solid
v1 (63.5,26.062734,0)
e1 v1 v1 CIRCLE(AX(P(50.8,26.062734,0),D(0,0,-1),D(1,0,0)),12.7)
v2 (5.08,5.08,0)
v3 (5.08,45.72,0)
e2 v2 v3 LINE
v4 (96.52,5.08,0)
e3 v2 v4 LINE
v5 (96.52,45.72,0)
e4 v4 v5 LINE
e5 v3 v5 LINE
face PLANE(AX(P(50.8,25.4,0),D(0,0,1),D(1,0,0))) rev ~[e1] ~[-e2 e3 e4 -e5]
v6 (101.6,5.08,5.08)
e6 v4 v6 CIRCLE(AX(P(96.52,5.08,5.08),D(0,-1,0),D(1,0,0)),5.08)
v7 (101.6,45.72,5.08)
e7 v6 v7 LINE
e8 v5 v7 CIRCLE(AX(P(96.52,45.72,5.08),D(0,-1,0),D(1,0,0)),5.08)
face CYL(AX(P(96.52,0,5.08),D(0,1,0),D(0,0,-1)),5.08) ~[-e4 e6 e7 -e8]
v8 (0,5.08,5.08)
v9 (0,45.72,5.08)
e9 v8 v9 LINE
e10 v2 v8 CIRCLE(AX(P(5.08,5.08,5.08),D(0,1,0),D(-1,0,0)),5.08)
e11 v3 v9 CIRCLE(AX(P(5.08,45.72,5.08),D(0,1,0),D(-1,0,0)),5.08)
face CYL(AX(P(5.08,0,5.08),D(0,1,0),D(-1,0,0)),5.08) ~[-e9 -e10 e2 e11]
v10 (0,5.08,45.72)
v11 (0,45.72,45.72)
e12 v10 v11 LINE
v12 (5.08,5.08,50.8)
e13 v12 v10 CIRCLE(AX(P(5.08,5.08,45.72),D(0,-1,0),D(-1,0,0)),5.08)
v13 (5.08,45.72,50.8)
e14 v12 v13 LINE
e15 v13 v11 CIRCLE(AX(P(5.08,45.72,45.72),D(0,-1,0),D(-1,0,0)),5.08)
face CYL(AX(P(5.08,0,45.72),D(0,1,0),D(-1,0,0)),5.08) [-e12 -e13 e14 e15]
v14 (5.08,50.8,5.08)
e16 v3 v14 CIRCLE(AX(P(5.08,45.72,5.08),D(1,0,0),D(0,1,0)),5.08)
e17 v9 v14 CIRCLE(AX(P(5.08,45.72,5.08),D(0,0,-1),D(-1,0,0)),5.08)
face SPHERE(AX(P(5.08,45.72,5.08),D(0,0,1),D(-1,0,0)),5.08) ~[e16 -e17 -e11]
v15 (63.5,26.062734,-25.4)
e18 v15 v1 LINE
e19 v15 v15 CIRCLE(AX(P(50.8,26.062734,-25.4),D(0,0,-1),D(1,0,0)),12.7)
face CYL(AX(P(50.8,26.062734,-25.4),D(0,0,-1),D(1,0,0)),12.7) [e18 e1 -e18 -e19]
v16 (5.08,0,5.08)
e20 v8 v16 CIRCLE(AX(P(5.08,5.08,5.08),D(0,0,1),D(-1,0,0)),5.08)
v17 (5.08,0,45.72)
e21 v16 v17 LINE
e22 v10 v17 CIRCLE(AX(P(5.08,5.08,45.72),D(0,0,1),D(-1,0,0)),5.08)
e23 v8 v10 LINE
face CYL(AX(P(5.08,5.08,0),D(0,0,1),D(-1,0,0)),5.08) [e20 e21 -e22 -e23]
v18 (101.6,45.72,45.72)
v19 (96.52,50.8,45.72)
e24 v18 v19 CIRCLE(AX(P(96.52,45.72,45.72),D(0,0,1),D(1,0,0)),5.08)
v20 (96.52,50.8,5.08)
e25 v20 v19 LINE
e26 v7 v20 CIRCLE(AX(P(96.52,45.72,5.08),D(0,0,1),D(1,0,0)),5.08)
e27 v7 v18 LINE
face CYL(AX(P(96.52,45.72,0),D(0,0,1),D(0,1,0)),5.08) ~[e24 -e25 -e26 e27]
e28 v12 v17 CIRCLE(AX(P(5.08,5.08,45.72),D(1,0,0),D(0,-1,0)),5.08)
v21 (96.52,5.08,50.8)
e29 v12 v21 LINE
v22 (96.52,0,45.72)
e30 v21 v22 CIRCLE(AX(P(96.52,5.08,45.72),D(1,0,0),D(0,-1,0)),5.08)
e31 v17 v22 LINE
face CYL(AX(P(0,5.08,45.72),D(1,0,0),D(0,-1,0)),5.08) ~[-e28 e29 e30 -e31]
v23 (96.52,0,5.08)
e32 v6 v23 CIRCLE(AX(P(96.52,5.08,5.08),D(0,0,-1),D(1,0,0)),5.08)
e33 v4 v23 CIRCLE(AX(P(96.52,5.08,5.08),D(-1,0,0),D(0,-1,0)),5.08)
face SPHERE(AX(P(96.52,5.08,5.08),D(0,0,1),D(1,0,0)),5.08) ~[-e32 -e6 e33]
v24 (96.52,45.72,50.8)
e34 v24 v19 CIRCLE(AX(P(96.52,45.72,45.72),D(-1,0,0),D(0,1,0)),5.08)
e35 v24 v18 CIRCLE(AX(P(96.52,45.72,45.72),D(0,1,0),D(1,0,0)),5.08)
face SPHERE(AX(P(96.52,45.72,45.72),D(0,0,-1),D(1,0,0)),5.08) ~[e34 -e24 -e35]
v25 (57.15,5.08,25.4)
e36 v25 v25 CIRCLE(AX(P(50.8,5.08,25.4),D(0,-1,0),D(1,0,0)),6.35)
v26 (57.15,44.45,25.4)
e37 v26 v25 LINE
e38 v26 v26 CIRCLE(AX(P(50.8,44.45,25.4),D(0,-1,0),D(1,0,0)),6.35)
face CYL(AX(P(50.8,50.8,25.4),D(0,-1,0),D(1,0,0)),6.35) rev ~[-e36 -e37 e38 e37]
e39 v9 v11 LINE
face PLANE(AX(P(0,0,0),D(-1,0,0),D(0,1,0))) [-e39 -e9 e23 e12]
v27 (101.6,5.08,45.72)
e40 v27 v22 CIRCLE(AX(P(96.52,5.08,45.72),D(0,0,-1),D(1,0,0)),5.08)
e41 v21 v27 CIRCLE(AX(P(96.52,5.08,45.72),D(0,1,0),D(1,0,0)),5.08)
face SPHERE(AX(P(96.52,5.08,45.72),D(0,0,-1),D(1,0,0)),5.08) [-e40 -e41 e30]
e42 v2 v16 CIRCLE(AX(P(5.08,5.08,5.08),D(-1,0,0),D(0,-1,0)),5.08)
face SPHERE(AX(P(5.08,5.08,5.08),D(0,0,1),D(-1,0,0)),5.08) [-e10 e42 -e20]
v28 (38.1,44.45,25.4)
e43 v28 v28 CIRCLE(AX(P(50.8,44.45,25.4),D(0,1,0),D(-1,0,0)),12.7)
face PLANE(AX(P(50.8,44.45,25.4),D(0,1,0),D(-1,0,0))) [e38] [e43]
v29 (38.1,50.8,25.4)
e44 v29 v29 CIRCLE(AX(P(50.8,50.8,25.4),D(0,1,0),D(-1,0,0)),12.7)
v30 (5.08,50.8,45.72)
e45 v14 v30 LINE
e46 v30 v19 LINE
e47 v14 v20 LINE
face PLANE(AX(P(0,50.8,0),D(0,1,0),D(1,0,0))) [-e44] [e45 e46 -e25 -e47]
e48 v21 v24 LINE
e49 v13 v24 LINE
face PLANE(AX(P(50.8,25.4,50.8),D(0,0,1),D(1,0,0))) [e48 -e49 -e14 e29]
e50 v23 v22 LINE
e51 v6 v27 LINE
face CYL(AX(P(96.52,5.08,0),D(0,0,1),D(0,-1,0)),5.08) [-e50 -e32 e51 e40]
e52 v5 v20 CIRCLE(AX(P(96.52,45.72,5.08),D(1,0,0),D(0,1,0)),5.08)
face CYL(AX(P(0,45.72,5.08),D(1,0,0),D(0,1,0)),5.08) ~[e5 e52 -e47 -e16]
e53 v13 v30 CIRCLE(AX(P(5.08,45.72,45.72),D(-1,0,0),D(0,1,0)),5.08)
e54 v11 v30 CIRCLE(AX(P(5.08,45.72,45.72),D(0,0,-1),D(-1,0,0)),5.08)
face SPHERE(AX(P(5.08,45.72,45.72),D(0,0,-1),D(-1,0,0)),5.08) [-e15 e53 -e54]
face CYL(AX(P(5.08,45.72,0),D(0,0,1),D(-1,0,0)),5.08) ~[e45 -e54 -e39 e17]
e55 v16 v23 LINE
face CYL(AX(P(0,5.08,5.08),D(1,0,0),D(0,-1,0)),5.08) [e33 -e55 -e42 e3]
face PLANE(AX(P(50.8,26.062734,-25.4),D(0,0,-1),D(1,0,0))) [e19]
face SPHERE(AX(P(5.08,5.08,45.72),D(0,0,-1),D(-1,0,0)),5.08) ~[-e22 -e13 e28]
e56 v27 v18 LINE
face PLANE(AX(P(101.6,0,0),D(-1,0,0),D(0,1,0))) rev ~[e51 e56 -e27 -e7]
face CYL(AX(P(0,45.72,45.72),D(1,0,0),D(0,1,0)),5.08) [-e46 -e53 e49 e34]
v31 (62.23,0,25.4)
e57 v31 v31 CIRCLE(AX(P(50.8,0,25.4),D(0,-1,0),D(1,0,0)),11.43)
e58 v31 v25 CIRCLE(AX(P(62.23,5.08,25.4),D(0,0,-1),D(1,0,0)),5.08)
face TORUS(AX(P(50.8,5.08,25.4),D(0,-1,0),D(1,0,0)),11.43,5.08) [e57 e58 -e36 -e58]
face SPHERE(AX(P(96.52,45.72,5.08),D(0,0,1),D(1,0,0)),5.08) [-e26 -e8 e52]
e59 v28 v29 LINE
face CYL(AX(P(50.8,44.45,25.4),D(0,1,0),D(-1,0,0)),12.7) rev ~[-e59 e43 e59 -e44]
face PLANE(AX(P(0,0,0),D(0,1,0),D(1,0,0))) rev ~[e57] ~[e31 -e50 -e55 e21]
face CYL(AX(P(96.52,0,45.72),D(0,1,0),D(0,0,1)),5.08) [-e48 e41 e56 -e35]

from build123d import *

# Parameters (mm, degrees)
F0_W           = 101.6
F0_H           = 50.8
F1_DEPTH       = 50.8
F3_D           = 12.7
F3_CBORE_D     = 25.4
F3_CBORE_DEPTH = 6.35
F5_R           = 12.7
F6_DEPTH       = 25.4
F7_R           = 5.08


with BuildPart() as f1:
    # F0 (on Top) → F1 (new body)
    with BuildSketch(Plane.XY):
        with Locations((50.8, 25.4)):
            Rectangle(F0_W, F0_H)
    extrude(amount=F1_DEPTH)

    # F3 (through all)
    with Locations(Plane(origin=(0, 50.8, 0), x_dir=(-1, 0, 0), z_dir=(0, 1, 0))):
        with Locations((-50.8, 25.4)):
            CounterBoreHole(F3_D / 2, F3_CBORE_D / 2, F3_CBORE_DEPTH)

    # F5 (on offset) → F6 (join, through all)
    with BuildSketch(Plane(origin=(0, 0, -25.4), x_dir=(1, 0, 0), z_dir=(0, 0, -1))):
        with Locations((50.8, -26.0627344251)):
            Circle(F5_R)
    extrude(amount=-F6_DEPTH)

    # F7
    f7_edges = [f1.edges().sort_by_distance(p)[0] for p in [
        (101.6, 0, 25.4),
        (101.6, 50.8, 25.4),
        (101.6, 25.4, 0),
        (101.6, 25.4, 50.8),
        (0, 50.8, 25.4),
        (0, 0, 25.4),
        (0, 25.4, 0),
        (0, 25.4, 50.8),
        (50.8, 0, 50.8),
        (50.8, 50.8, 50.8),
        (50.8, 0, 0),
        (57.15, 0, 25.4),
        (50.8, 50.8, 0),
    ]]
    fillet(f7_edges, radius=F7_R)


solid = f1.part
